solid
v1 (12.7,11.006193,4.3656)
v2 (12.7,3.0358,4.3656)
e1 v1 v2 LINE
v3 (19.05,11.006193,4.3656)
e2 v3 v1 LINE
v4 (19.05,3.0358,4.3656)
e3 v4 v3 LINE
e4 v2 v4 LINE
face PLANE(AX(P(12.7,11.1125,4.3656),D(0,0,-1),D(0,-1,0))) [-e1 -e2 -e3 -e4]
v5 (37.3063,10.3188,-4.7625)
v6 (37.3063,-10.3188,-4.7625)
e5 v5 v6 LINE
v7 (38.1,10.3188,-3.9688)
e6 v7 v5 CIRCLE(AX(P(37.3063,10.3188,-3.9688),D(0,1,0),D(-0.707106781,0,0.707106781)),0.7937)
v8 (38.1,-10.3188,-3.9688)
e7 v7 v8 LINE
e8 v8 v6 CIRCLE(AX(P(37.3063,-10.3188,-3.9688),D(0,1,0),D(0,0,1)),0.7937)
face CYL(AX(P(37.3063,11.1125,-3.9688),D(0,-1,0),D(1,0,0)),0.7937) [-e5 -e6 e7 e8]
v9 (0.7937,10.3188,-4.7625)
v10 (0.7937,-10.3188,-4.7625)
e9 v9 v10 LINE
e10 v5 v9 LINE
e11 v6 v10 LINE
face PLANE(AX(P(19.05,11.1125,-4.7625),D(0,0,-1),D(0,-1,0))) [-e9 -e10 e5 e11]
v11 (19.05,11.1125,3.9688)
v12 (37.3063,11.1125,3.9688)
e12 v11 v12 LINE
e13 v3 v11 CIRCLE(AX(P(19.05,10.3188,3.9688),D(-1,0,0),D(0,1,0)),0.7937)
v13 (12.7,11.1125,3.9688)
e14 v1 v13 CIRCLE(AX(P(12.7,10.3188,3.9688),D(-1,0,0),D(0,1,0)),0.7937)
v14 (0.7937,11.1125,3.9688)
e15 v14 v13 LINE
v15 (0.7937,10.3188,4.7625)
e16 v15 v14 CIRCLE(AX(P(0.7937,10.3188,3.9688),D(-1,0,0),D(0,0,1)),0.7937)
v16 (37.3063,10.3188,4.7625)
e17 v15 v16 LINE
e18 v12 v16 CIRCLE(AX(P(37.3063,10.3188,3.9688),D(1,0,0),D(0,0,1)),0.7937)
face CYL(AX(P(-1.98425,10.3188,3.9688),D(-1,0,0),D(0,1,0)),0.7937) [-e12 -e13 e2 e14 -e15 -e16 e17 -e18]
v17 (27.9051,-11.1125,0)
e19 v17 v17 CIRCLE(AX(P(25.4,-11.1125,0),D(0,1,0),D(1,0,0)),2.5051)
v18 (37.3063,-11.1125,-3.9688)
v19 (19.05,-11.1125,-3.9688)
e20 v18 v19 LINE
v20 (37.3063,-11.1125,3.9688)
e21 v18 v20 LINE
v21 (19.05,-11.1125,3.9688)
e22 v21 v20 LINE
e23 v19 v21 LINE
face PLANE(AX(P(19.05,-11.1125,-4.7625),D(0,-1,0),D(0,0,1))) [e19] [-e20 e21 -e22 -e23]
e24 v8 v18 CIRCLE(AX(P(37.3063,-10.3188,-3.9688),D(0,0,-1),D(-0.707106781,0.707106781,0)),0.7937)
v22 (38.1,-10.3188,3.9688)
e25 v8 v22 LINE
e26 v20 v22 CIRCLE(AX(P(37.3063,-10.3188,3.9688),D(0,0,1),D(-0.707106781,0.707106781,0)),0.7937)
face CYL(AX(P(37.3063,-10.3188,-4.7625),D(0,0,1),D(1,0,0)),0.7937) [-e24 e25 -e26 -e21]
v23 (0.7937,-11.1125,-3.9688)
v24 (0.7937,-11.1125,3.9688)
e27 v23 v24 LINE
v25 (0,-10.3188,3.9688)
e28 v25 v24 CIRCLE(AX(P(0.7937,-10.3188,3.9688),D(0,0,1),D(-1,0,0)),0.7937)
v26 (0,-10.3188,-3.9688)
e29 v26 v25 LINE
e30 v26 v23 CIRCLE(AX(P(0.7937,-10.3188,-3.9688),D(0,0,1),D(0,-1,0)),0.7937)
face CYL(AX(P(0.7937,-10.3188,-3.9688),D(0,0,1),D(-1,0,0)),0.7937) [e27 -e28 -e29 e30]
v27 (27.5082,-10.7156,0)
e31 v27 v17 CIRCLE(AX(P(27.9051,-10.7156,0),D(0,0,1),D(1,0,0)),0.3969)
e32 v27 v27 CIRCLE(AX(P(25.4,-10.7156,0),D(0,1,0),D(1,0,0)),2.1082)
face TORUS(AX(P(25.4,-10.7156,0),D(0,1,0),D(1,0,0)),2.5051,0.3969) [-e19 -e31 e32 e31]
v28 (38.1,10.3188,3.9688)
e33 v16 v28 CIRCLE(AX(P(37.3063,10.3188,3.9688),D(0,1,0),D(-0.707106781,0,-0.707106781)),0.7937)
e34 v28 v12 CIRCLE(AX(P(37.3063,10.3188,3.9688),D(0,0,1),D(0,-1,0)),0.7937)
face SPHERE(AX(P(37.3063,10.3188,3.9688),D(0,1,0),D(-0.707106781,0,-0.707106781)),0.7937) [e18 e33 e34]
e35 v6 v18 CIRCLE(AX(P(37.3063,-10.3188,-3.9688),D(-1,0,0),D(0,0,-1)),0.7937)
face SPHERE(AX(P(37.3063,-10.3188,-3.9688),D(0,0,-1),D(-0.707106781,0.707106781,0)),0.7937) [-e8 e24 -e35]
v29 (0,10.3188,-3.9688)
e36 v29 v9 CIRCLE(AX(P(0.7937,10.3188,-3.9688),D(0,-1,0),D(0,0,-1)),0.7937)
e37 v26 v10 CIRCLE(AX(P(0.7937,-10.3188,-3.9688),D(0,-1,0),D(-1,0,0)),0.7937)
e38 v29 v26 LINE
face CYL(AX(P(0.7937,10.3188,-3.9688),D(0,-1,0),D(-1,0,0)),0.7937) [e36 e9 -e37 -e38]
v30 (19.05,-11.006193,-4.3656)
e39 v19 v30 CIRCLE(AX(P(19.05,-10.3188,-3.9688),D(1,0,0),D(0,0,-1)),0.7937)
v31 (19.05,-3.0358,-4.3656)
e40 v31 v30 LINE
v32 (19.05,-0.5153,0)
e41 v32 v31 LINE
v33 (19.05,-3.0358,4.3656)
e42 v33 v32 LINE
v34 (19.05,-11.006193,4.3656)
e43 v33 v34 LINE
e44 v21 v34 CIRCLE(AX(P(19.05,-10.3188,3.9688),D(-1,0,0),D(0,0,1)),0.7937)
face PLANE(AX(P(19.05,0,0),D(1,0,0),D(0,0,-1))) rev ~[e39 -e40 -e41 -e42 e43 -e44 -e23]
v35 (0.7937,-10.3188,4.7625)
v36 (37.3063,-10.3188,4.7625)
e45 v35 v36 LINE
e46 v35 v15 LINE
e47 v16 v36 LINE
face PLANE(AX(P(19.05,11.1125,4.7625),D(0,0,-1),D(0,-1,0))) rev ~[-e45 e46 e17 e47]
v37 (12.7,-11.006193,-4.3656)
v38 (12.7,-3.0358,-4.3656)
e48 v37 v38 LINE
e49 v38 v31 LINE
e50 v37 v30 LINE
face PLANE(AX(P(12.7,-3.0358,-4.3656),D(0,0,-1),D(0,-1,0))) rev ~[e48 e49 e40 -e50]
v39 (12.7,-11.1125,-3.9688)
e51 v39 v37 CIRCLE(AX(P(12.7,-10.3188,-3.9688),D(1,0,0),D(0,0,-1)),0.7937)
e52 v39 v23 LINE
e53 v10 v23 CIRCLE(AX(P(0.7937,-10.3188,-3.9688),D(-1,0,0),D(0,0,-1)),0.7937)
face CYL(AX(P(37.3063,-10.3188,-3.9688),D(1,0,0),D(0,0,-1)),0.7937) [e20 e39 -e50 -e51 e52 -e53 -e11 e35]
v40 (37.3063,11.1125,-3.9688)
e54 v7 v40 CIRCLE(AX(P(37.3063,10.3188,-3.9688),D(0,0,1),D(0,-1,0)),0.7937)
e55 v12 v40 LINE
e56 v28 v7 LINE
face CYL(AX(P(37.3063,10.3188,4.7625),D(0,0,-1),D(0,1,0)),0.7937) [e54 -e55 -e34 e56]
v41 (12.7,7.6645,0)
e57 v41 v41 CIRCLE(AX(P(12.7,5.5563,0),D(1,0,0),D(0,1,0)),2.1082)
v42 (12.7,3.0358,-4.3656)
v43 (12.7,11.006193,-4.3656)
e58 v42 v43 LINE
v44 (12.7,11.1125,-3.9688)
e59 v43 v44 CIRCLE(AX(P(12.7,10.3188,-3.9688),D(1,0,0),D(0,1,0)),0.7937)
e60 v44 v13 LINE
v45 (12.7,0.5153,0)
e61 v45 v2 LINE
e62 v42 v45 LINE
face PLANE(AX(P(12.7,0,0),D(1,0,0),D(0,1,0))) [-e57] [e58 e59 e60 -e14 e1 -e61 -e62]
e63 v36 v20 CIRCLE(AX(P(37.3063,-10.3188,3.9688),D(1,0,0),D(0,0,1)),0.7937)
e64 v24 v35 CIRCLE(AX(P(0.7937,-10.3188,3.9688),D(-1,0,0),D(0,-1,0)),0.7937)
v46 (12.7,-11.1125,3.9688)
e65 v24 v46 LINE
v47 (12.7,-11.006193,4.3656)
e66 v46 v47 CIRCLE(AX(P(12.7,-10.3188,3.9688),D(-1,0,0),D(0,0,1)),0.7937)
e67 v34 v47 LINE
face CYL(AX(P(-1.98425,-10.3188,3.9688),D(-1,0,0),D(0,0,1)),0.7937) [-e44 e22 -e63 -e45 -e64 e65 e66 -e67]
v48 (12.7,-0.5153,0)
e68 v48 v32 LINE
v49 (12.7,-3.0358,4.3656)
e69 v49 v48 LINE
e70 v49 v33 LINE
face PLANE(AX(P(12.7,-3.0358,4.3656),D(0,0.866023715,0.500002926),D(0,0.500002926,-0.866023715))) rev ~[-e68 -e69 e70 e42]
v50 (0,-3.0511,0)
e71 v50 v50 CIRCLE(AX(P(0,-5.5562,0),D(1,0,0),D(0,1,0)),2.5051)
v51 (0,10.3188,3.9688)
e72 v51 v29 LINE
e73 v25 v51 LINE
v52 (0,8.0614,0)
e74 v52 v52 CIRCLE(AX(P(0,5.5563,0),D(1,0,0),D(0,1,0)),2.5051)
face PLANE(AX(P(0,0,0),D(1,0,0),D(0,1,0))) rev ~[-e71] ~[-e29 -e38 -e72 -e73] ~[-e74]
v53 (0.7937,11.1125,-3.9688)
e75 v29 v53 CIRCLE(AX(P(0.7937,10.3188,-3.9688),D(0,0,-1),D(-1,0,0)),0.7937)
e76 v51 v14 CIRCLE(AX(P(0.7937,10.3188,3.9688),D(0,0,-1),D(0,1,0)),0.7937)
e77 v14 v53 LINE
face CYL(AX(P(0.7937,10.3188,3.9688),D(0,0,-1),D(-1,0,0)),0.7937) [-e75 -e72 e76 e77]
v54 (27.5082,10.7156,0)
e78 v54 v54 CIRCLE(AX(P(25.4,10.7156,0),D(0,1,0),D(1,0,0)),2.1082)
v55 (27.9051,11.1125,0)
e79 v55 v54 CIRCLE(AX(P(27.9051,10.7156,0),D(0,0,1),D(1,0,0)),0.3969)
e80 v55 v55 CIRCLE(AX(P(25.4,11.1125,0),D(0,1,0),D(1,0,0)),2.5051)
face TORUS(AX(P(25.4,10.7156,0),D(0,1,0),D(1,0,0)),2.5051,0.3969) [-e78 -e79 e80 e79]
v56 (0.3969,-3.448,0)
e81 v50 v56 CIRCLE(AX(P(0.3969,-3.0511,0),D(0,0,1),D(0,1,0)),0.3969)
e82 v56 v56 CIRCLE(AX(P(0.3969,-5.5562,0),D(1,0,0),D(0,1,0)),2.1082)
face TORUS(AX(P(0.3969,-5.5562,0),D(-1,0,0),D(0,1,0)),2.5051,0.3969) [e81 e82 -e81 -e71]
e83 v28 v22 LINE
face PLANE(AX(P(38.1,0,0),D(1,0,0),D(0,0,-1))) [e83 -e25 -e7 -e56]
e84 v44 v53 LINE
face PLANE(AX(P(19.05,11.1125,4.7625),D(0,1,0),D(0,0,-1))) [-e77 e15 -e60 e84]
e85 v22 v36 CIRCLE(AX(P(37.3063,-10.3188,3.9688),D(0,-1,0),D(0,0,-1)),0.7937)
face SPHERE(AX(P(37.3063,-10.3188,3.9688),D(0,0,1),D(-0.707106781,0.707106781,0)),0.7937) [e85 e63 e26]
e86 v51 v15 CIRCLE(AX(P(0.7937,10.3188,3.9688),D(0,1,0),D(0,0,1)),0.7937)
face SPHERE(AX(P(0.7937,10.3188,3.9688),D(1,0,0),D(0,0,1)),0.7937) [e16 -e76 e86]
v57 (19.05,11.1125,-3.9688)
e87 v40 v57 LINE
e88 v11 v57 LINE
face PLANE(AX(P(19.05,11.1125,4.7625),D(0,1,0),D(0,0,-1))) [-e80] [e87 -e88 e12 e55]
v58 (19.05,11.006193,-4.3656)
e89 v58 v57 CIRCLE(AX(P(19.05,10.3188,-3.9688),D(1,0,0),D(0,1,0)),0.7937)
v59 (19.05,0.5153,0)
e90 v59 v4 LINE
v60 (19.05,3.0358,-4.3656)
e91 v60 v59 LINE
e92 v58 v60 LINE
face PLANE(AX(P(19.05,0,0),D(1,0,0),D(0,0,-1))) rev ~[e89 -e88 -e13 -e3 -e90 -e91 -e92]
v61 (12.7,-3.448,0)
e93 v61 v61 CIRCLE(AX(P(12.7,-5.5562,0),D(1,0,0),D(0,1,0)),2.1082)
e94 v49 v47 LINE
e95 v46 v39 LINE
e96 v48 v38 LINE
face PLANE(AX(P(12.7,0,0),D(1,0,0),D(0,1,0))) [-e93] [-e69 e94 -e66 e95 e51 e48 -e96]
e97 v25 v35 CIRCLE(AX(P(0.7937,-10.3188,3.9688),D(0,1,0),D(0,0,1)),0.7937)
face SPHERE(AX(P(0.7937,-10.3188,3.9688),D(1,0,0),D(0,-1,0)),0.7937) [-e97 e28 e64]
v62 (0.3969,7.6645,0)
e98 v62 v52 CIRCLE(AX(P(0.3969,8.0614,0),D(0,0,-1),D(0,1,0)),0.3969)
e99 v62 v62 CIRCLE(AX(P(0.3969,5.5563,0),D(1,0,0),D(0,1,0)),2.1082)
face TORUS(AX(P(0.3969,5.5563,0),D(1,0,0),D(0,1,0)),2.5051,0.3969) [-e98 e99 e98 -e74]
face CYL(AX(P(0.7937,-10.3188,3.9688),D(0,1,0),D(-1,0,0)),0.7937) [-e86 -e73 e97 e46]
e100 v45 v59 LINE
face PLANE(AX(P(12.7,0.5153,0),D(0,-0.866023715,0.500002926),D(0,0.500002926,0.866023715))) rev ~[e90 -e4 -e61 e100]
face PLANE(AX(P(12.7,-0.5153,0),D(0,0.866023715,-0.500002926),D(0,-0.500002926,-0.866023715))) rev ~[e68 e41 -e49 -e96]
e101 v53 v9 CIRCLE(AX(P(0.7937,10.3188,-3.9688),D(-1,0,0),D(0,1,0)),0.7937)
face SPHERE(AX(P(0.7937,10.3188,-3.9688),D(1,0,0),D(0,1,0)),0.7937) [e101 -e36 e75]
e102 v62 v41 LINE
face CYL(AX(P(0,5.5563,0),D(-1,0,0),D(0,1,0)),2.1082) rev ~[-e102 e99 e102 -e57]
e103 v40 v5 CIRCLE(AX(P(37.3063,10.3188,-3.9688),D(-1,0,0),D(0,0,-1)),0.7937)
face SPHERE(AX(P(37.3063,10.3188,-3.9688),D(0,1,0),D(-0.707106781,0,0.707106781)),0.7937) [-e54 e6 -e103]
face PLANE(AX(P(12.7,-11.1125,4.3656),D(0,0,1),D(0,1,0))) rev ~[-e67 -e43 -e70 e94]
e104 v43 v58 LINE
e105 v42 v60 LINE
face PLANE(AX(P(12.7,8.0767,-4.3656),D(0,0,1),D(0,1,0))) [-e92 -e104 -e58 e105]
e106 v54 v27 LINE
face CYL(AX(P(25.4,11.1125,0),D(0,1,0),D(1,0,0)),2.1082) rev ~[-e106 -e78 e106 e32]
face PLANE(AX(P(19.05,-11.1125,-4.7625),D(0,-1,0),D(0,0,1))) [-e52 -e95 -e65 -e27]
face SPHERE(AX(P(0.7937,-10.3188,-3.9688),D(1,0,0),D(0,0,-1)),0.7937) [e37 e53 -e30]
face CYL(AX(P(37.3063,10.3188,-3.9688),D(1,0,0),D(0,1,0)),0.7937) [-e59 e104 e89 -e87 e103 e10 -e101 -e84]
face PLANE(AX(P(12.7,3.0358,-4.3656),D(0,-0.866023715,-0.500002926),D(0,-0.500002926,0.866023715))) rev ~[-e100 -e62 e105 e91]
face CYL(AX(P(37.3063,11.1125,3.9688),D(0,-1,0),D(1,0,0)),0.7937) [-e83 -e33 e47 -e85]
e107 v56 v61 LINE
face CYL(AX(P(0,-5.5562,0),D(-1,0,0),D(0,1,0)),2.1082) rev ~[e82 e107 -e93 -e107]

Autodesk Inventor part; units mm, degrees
ref_plane "YZ Plane" through (0, 0, 0) normal (1, 0, 0) x (0, 1, 0)
ref_plane "XZ Plane" through (0, 0, 0) normal (0, 1, 0) x (-1, 0, 0)
ref_plane "XY Plane" through (0, 0, 0) normal (0, 0, 1) x (1, 0, 0)
sketch "Sketch1" plane through (0, 0, 0) normal (1, 0, 0) x (0, 1, 0)
  line L0 (-11.1125, -4.7625) -> (11.1125, -4.7625)
  line L1 (11.1125, -4.7625) -> (11.1125, 4.7625)
  line L2 (11.1125, 4.7625) -> (-11.1125, 4.7625)
  line L3 (-11.1125, 4.7625) -> (-11.1125, -4.7625)
  line L4 (-11.1125, -4.7625) -> (11.1125, 4.7625) construction
  line L5 (11.1125, -4.7625) -> (-11.1125, 4.7625) construction
  circle A0 centre (5.5563, 0) radius 2.1082
  circle A1 centre (-5.5562, 0) radius 2.1082
  point P0 (0, 0)
  point P1 (-11.1125, 0)
  dimension "d0" = 9.525
  dimension "d1" = 22.225
  dimension "d2" = 4.2164
  dimension "d3" = 4.2164
  dimension "d4" = 5.5563
  dimension "d5" = 5.5563
extrude "Extrusion1" add sketch "Sketch1" along normal blind 12.7
sketch "Sketch2" plane through (12.7, 0, 0) normal (1, 0, 0) x (0, 0, -1)
  circle A0 centre (0, 5.5563) radius 2.1082 projected
  line L0 (0, 10.5972) -> (4.3656, 8.0767)
  line L1 (4.3656, 8.0767) -> (4.3656, 3.0358)
  line L2 (4.3656, 3.0358) -> (0, 0.5153)
  line L3 (0, 0.5153) -> (-4.3656, 3.0358)
  line L4 (-4.3656, 3.0358) -> (-4.3656, 8.0767)
  line L5 (-4.3656, 8.0767) -> (0, 10.5972)
  circle A1 centre (0, -5.5562) radius 2.1082 projected
  line L6 (0, -0.5153) -> (4.3656, -3.0358)
  line L7 (4.3656, -3.0358) -> (4.3656, -8.0767)
  line L8 (4.3656, -8.0767) -> (0, -10.5972)
  line L9 (0, -10.5972) -> (-4.3656, -8.0767)
  line L10 (-4.3656, -8.0767) -> (-4.3656, -3.0358)
  line L11 (-4.3656, -3.0358) -> (0, -0.5153)
  line L12 (4.7625, 11.1125) -> (-4.7625, 11.1125) projected
  line L13 (-4.7625, 11.1125) -> (-4.7625, -11.1125) projected
  line L14 (-4.7625, -11.1125) -> (4.7625, -11.1125) projected
  line L15 (4.7625, -11.1125) -> (4.7625, 11.1125) projected
  circle A2 centre (0, 5.5563) radius 2.1082 projected
  circle A3 centre (0, -5.5562) radius 2.1082 projected
  line L16 (-4.3656, 8.0767) -> (4.3656, 8.0767)
  line L17 (4.3656, 8.0767) -> (4.3656, 13.7838)
  line L18 (4.3656, 13.7838) -> (-4.3656, 13.7838)
  line L19 (-4.3656, 13.7838) -> (-4.3656, 8.0767)
  line L20 (-4.3656, -8.0767) -> (4.3656, -8.0767)
  line L21 (4.3656, -8.0767) -> (4.3656, -13.1177)
  line L22 (4.3656, -13.1177) -> (-4.3656, -13.1177)
  line L23 (-4.3656, -13.1177) -> (-4.3656, -8.0767)
  point P0 (-4.3656, 11.1125)
  point P1 (-4.3656, -11.1125)
  point P2 (4.3656, -11.1125)
  point P3 (4.3656, 11.1125)
  dimension "d10" = 4.3656
  dimension "d11" = 4.3656
extrude "Extrusion2" add sketch "Sketch2" along normal blind 6.35 contours L17 L12 L15 L14 L21 L7 L6 L11 L10 L23 L13 L19 L4 L3 L2 L1
sketch "Sketch3" plane through (19.05, 0, 0) normal (1, 0, 0) x (0, 0, -1)
  line L0 (-4.7625, 11.1125) -> (-4.7625, -11.1125) projected
  line L1 (4.7625, -11.1125) -> (-4.7625, -11.1125)
  line L2 (-4.7625, -11.1125) -> (-4.7625, 11.1125)
  line L3 (-4.7625, 11.1125) -> (4.7625, 11.1125)
  line L4 (4.7625, 11.1125) -> (4.7625, -11.1125)
  line L5 (4.7625, -11.1125) -> (-4.7625, 11.1125) construction
  line L6 (-4.7625, -11.1125) -> (4.7625, 11.1125) construction
  point P0 (0, 0)
extrude "Extrusion3" add sketch "Sketch3" along normal blind 19.05
sketch "Sketch4" plane through (0, 11.1125, 4.7625) normal (0, 1, 0) x (1, 0, 0)
  circle A0 centre (25.4, 4.7625) radius 2.1082
  line L0 (38.1, 9.525) -> (38.1, 0) projected
  line L1 (0, 9.525) -> (0, 0) projected
  point P0 (0, 4.7625)
  dimension "d16" = 4.2164
  dimension "d25" = 25.4
extrude "Extrusion4" cut sketch "Sketch4" against normal blind 25.4
fillet "Fillet1" radius 0.7937 4 edges at (38.1, 0, -4.7625) (38.1, 11.1125, 0) (38.1, 0, 4.7625) (38.1, -11.1125, 0)
fillet "Fillet2" radius 0.7937 8 edges at (37.8675, 10.88, -4.53) (18.6531, 11.1125, -4.7625) (37.8675, 10.88, 4.53) (18.6531, 11.1125, 4.7625) (37.8675, -10.88, -4.53) (18.6531, -11.1125, -4.7625) (37.8675, -10.88, 4.53) (18.6531, -11.1125, 4.7625)
fillet "Fillet3" radius 0.7937 8 edges at (0, 10.88, 4.53) (0, 0, 4.7625) (0, -10.88, 4.53) (0, -11.1125, 0) (0, -10.88, -4.53) (0, 0, -4.7625) (0, 10.88, -4.53) (0, 11.1125, 0)
fillet "Fillet4" radius 0.3969 2 edges at (23.2918, 11.1125, 0) (23.2918, -11.1125, 0)
fillet "Fillet5" radius 0.3969 2 edges at (0, 3.4481, 0) (0, -7.6644, 0)
properties part number ".5x1 Tube Stock Insert" material "PBT Plastic"
